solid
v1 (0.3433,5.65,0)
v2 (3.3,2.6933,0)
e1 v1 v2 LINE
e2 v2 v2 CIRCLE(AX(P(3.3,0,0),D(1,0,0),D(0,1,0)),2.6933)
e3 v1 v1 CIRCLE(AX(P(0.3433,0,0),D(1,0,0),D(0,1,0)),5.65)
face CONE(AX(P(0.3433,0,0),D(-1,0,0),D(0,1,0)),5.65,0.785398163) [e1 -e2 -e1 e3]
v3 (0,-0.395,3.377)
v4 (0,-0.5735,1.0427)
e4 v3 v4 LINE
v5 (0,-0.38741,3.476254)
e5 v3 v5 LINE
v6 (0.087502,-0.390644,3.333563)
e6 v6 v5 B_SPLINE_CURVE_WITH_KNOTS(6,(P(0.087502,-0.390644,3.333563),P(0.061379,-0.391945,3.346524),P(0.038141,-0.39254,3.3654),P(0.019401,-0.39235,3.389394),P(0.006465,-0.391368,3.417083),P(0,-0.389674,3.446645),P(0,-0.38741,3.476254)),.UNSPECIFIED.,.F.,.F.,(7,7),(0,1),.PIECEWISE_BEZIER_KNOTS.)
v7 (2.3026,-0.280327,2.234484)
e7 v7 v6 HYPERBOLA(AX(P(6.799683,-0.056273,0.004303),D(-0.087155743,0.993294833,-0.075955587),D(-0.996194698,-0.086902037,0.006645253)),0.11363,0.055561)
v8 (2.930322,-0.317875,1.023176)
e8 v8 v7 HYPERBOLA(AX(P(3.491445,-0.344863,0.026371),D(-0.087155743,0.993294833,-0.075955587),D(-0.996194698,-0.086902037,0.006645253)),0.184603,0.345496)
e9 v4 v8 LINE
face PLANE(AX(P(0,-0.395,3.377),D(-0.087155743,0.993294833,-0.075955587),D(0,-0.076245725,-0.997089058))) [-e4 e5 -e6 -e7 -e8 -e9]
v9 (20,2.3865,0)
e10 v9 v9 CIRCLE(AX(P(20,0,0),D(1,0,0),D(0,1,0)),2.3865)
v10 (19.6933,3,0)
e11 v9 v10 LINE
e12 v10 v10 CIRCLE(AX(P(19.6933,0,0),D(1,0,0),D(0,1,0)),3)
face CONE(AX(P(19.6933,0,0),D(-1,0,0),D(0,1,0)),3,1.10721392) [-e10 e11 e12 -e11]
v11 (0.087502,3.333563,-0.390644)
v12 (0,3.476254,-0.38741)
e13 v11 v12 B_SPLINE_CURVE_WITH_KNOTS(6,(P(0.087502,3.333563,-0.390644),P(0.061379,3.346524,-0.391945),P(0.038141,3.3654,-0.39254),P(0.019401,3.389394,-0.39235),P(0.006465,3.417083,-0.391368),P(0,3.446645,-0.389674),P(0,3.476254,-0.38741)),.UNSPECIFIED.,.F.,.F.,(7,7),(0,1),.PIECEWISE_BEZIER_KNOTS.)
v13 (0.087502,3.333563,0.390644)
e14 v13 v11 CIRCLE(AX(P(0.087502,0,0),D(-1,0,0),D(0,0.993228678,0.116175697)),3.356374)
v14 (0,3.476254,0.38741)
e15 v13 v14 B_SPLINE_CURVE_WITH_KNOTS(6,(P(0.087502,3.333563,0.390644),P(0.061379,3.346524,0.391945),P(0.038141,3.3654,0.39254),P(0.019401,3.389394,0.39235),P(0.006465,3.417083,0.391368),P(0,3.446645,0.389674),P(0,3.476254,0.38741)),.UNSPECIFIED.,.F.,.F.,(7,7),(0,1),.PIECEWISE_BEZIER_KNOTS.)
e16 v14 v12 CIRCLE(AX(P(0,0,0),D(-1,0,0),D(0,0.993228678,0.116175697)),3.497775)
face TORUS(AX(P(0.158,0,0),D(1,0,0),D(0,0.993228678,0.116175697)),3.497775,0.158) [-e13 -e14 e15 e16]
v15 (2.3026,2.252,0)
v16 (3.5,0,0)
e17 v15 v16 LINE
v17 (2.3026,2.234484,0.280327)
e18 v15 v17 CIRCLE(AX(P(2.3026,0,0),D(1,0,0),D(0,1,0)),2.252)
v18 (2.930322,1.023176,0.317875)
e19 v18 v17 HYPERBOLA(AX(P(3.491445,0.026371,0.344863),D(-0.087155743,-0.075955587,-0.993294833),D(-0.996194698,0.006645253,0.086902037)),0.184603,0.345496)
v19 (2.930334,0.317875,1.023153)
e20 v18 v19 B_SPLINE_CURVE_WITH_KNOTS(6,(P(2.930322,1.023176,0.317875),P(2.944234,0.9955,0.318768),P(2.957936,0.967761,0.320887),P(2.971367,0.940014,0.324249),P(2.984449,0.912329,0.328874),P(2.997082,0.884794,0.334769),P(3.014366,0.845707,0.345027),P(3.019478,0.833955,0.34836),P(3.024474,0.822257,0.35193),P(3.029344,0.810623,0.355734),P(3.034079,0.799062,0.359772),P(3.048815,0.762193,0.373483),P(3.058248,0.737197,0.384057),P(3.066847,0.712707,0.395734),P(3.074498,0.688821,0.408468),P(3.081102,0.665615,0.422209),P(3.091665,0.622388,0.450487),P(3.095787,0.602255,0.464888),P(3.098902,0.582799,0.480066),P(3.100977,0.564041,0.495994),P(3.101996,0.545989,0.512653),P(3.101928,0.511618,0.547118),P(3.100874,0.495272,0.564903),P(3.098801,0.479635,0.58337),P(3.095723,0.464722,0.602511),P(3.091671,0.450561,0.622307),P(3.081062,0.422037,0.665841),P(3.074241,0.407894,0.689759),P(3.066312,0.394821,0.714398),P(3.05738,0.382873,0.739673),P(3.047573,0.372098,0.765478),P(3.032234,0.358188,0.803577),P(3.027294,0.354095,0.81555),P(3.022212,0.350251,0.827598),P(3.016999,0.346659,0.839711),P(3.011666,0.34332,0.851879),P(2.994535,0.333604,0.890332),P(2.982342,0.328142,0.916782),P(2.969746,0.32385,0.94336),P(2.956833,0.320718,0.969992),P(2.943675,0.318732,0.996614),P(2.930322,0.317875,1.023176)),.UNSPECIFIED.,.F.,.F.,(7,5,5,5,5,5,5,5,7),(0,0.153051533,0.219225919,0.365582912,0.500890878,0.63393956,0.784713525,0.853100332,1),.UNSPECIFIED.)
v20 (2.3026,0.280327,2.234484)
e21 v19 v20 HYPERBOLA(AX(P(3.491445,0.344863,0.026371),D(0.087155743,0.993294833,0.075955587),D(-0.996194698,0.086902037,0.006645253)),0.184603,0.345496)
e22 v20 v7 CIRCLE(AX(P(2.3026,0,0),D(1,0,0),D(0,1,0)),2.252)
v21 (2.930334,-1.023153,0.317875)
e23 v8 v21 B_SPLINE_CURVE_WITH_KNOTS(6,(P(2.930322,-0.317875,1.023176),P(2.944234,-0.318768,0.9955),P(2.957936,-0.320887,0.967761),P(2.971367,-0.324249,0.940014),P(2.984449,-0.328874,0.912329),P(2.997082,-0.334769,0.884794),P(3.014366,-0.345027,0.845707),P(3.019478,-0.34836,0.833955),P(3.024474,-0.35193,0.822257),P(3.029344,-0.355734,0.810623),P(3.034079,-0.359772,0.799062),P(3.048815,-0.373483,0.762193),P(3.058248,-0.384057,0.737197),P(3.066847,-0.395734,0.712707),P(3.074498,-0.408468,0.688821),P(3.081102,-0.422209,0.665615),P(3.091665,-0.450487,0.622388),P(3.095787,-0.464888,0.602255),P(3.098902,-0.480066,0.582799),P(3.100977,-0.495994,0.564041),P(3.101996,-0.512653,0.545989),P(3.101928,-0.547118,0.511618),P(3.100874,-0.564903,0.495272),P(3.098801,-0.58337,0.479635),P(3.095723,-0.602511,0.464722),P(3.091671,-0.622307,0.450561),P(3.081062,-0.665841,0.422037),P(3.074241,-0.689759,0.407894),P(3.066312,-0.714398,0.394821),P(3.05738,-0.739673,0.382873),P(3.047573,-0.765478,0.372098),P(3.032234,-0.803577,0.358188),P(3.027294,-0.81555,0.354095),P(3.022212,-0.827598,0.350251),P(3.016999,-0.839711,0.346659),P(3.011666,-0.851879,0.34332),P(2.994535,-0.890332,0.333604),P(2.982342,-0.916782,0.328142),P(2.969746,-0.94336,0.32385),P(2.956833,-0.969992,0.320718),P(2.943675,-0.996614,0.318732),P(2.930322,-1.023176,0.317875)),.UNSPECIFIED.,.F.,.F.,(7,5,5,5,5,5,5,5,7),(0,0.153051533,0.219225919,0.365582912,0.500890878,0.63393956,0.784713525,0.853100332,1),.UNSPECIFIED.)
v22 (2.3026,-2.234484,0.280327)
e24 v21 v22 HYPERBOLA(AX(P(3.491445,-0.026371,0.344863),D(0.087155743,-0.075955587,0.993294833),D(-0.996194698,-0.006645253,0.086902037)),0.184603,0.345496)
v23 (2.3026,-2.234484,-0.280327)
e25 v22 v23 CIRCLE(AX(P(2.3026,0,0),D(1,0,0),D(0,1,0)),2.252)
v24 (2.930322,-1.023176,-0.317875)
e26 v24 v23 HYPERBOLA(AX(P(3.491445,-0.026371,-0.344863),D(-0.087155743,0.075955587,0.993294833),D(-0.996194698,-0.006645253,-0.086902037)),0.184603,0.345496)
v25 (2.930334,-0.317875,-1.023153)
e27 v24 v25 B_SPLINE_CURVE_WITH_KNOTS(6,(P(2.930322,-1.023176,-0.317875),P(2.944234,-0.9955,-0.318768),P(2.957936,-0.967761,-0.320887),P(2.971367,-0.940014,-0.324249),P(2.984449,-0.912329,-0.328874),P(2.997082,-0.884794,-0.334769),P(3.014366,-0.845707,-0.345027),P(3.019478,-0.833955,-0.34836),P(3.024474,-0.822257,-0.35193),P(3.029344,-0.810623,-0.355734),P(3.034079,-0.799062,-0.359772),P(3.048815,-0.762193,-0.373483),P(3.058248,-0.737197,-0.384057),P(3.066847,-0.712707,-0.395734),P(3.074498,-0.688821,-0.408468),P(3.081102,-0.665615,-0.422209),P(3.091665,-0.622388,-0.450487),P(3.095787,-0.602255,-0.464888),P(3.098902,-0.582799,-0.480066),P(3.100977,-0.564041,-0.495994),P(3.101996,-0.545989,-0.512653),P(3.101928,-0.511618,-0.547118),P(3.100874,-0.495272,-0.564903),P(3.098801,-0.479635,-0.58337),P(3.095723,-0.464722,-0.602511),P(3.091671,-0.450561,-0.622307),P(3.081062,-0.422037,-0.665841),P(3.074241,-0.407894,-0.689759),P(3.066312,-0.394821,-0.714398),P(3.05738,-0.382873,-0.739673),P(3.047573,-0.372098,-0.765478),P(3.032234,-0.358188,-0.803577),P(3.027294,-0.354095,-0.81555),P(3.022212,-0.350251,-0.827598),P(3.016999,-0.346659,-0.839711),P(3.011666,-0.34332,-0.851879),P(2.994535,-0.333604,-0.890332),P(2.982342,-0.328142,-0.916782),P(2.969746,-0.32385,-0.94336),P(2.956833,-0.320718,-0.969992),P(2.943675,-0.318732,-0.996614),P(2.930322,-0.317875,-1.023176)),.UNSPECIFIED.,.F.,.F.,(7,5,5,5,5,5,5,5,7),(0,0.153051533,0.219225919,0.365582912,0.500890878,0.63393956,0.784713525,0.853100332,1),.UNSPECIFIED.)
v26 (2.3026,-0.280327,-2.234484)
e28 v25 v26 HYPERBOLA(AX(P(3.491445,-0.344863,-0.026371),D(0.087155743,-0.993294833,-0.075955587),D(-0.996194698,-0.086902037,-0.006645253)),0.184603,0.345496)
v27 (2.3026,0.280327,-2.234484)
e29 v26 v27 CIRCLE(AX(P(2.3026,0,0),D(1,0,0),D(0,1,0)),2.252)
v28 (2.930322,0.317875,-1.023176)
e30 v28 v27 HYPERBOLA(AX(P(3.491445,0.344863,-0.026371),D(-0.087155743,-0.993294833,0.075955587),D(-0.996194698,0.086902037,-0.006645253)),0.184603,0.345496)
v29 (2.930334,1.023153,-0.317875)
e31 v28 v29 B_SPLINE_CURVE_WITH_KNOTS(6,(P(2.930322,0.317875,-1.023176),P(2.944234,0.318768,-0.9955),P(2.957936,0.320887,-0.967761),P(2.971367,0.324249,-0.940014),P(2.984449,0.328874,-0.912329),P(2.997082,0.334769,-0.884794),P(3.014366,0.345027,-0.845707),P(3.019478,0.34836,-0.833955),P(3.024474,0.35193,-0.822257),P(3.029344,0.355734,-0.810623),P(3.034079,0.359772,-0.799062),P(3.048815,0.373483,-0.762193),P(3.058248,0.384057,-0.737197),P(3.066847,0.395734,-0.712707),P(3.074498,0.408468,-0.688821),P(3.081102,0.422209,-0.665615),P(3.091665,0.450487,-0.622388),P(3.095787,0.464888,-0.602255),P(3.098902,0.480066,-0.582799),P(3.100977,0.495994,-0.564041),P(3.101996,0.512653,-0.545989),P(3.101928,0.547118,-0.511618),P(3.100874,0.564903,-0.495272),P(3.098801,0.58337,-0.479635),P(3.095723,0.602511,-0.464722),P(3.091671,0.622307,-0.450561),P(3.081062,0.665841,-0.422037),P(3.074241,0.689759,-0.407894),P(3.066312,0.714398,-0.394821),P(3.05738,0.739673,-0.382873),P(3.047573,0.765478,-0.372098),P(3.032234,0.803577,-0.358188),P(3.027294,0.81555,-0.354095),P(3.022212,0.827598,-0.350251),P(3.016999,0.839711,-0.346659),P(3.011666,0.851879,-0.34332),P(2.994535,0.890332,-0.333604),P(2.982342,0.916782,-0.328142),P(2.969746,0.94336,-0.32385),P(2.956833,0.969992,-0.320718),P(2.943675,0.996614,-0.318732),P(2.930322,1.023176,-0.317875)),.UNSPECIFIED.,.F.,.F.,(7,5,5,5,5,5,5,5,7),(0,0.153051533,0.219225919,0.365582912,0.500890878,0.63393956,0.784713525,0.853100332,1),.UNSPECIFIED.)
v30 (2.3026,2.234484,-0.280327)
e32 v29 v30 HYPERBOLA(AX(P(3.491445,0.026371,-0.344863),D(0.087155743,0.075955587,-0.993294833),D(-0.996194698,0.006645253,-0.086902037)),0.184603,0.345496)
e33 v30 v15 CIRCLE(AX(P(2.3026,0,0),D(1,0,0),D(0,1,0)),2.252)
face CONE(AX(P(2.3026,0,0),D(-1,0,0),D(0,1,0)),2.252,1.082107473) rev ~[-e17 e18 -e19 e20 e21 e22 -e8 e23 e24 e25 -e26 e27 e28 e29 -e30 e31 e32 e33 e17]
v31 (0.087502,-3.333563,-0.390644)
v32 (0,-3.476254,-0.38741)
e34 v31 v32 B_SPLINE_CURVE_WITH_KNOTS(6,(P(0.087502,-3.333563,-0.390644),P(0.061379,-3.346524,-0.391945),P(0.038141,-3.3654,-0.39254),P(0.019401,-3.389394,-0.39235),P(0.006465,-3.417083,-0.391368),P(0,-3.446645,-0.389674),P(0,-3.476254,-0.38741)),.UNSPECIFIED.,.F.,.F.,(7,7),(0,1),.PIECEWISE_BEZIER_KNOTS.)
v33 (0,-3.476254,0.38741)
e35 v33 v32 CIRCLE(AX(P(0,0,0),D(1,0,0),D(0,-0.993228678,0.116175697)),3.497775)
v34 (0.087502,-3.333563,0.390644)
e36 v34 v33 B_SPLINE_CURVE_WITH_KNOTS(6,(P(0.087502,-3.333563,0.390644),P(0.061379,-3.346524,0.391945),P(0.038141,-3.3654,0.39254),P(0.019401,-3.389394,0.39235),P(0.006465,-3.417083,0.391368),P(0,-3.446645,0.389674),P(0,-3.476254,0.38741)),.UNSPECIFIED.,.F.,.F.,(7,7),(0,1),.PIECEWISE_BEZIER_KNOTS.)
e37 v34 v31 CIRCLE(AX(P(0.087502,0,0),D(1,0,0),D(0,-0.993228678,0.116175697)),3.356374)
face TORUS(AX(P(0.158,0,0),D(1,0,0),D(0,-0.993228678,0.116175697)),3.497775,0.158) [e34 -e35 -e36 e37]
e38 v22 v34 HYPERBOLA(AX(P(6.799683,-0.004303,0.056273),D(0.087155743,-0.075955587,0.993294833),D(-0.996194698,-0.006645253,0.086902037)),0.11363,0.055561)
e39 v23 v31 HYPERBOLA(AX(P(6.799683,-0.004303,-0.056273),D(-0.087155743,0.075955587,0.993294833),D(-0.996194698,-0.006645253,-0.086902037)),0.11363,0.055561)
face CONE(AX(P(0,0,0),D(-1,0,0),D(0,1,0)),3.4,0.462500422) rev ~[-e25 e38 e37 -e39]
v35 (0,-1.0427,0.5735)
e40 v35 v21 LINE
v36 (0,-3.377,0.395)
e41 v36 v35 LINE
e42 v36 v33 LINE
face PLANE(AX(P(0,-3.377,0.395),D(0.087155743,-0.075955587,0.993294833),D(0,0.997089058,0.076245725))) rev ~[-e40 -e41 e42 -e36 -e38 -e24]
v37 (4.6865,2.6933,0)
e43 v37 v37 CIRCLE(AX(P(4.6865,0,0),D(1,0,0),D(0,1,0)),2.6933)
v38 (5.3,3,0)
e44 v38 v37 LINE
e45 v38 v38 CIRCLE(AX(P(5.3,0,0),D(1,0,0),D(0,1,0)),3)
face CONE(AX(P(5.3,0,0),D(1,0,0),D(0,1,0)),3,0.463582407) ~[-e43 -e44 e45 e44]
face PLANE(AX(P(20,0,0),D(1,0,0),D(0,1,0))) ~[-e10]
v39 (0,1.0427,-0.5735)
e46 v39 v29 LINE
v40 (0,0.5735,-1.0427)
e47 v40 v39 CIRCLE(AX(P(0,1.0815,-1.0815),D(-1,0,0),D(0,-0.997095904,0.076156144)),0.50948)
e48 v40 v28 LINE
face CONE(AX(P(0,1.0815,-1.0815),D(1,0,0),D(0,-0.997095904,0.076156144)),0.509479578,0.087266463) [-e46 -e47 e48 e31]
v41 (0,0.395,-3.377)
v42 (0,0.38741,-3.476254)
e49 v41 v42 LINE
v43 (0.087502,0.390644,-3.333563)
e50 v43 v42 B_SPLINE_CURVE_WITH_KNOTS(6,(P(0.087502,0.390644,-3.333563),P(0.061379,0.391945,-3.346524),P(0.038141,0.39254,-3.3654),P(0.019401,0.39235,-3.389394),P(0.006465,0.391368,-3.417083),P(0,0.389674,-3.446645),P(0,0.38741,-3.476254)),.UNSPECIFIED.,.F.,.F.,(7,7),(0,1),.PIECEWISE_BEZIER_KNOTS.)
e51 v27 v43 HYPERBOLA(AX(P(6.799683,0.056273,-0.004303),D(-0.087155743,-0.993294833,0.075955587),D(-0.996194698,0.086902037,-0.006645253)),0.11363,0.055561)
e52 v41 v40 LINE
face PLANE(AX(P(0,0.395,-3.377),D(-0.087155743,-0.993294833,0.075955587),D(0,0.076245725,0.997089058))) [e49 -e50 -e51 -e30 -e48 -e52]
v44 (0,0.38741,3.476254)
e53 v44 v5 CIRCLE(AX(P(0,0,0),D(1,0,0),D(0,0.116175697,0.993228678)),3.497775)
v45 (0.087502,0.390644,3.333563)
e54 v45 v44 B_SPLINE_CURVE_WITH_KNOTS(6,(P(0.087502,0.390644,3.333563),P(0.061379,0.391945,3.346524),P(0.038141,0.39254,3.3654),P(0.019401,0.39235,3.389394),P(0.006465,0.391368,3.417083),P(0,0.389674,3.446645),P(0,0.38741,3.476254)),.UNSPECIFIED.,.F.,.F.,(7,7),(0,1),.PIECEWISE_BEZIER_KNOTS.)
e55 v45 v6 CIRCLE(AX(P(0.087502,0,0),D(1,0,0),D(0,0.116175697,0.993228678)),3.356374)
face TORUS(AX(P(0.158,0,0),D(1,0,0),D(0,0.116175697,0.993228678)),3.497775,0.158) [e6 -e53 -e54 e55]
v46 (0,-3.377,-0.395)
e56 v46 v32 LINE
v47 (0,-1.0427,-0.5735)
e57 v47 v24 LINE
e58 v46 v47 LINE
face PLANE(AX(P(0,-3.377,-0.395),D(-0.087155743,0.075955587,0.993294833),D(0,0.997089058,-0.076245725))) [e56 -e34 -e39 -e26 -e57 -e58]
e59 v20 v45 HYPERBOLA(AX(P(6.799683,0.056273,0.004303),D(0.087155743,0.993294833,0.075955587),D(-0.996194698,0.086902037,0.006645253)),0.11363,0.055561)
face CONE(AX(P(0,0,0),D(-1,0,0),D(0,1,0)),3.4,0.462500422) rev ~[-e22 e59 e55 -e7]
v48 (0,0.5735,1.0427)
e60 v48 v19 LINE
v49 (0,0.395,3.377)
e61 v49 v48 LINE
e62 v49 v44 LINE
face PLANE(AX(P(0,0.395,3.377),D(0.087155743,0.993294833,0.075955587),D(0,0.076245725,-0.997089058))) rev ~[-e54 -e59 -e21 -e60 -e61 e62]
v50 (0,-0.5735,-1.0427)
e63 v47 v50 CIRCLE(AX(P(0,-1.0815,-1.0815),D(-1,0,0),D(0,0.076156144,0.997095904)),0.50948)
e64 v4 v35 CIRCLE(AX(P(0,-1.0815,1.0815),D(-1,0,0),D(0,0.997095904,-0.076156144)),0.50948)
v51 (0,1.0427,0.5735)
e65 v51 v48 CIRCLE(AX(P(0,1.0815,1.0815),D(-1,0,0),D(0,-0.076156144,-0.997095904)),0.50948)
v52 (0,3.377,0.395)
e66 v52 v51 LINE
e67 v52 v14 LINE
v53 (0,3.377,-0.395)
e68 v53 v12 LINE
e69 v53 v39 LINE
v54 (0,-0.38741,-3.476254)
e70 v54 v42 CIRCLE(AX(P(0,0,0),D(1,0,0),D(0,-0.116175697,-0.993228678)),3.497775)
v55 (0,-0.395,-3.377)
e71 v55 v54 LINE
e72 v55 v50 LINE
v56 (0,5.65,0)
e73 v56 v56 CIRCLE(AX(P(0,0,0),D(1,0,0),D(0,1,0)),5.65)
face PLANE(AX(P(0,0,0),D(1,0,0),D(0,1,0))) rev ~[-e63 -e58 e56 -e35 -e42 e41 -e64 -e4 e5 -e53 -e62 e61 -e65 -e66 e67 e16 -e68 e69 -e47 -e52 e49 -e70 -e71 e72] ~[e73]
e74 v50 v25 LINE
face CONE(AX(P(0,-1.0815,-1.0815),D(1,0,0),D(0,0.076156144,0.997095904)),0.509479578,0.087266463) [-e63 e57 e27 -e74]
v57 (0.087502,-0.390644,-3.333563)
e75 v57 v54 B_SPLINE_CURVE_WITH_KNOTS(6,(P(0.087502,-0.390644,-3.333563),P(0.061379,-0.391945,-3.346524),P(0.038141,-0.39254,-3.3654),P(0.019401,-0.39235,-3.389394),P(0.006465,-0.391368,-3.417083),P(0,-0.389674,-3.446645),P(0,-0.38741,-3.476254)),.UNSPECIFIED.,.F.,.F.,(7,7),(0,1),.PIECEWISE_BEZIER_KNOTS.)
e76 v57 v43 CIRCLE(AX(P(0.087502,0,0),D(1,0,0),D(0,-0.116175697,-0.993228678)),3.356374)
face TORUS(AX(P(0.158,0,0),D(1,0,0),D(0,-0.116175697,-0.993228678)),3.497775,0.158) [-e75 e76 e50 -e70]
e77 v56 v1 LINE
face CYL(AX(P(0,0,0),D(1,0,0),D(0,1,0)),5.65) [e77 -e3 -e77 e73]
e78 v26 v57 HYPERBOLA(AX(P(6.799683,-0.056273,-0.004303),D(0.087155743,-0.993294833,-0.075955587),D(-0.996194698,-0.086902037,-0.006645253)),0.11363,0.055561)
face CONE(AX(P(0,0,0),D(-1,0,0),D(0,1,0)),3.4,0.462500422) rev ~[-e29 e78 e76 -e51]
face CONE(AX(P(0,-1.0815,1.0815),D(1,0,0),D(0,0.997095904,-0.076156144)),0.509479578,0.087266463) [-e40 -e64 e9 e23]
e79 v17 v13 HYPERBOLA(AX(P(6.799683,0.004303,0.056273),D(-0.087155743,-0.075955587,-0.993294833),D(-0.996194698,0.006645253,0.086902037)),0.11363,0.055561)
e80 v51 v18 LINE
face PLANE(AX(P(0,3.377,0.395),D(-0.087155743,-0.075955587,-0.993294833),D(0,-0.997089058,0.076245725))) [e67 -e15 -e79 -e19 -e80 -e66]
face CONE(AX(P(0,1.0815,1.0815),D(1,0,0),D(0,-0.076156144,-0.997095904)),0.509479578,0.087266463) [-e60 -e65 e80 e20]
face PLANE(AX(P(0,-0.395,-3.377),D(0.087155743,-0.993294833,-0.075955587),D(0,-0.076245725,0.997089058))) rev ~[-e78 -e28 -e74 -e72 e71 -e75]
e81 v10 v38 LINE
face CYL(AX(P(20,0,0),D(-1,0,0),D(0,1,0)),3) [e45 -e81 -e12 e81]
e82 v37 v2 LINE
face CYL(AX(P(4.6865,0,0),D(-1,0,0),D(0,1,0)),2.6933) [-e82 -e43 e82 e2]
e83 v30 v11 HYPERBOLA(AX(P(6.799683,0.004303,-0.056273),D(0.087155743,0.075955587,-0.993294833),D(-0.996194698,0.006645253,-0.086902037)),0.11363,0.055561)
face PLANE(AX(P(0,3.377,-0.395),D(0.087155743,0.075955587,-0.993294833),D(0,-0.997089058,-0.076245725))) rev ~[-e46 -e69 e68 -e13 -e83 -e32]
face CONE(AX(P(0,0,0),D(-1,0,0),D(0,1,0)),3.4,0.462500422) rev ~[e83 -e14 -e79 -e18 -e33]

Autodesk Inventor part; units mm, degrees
ref_plane "YZ Plane" through (0, 0, 0) normal (1, 0, 0) x (0, 1, 0)
ref_plane "XZ Plane" through (0, 0, 0) normal (0, 1, 0) x (-1, 0, 0)
sketch "Эскиз1" plane through (0, 0, 0) normal (0, 0, 1) x (1, 0, 0)
  line L0 (3.5, 0) -> (20, 0)
  line L1 (20, 0) -> (20, 3)
  line L2 (20, 3) -> (5.3, 3)
  line L3 (5.3, 3) -> (4.6865, 2.6933)
  line L4 (4.6865, 2.6933) -> (3.3, 2.6933)
  line L5 (0, 5.65) -> (0, 3.4)
  line L6 (0, 3.4) -> (2.3026, 2.252)
  line L7 (2.3026, 2.252) -> (3.5, 0)
  line L8 (-4, 0) -> (24, 0) projected
  line L9 (0, -1.13) -> (0, 6.78) projected
  line L10 (0, 5.65) -> (0.3433, 5.65)
  line L11 (0.3433, 5.65) -> (3.3, 2.6933)
  line L12 (5.3, 3) -> (2.9933, 3) construction
  dimension "d1" = 14.7
  dimension "d2" = 6
  dimension "d3" = 5.3865
  dimension "d4" = 6.8
  dimension "d5" = 26.5
  dimension "d6" = 62
  dimension "d7" = 3.5
  dimension "d8" = 0.6135
  dimension "d12" = 11.3
  dimension "d13" = 45
  dimension "d15" = 20
  dimension "d24" = 3.3
revolve "Базовый элемент" add sketch "Эскиз1" angle 360 about axis through (3.5, 0, 0) along (1, 0, 0) contours L7 L6 L5 L10 L11 L4 L3 L2 L1 L0
sketch "Эскиз2" plane through (0, 0, 0) normal (-1, 0, 0) x (0, 0, 1)
  line L0 (0, 3.4) -> (0, 0) construction
  line L1 (0, 0) -> (3.4, 0) construction
  arc A0 (1.02, 0) -> (0, 1.02) centre (0, 0) ccw construction
  arc A1 (1.19, 0) -> (0, 1.19) centre (0, 0) ccw construction
  arc A2 (3.377, 0.395) -> (0.395, 3.377) centre (0, 0) ccw
  line L2 (0, 0) -> (2.4042, 2.4042) construction
  line L3 (0.395, 3.377) -> (0.5735, 1.0427)
  line L4 (3.377, 0.395) -> (1.0427, 0.5735)
  arc A3 (0.395, 3.377) -> (0, 3.4) centre (0, 0) ccw
  arc A4 (3.4, 0) -> (3.377, 0.395) centre (0, 0) ccw
  line L5 (0, -7.91) -> (0, 7.91) projected
  line L6 (-7.91, 0) -> (7.91, 0) projected
  arc A5 (0.395, -3.377) -> (3.377, -0.395) centre (0, 0) ccw
  line L7 (0.395, -3.377) -> (0.5735, -1.0427)
  line L8 (3.377, -0.395) -> (1.0427, -0.5735)
  arc A6 (0, -3.4) -> (0.395, -3.377) centre (0, 0) ccw
  arc A7 (3.377, -0.395) -> (3.4, 0) centre (0, 0) ccw
  arc A8 (-0.395, 3.377) -> (-3.377, 0.395) centre (0, 0) ccw
  line L9 (-0.395, 3.377) -> (-0.5735, 1.0427)
  line L10 (-3.377, 0.395) -> (-1.0427, 0.5735)
  arc A9 (0, 3.4) -> (-0.395, 3.377) centre (0, 0) ccw
  arc A10 (-3.377, 0.395) -> (-3.4, 0) centre (0, 0) ccw
  arc A11 (-0.395, -3.377) -> (0, -3.4) centre (0, 0) ccw
  arc A12 (-3.377, -0.395) -> (-0.395, -3.377) centre (0, 0) ccw
  arc A13 (-3.4, 0) -> (-3.377, -0.395) centre (0, 0) ccw
  line L11 (-3.377, -0.395) -> (-1.0427, -0.5735)
  line L12 (-0.395, -3.377) -> (-0.5735, -1.0427)
  arc A14 (0.5735, 1.0427) -> (1.0427, 0.5735) centre (1.0815, 1.0815) ccw
  arc A15 (1.0427, -0.5735) -> (0.5735, -1.0427) centre (1.0815, -1.0815) ccw
  arc A16 (-1.0427, 0.5735) -> (-0.5735, 1.0427) centre (-1.0815, 1.0815) ccw
  arc A17 (-0.5735, -1.0427) -> (-1.0427, -0.5735) centre (-1.0815, -1.0815) ccw
  point P0 (2.4042, -2.4042)
  point P1 (-2.4042, 2.4042)
  point P2 (-2.4042, -2.4042)
  dimension "d17" = 2.04
  dimension "d18" = 2.38
  dimension "d19" = 6.8
  dimension "d20" = 45
  dimension "d21" = 0.395
extrude "Паз" add sketch "Эскиз2" against normal up to next draft 5 contours L4 A14 L3 A2 | A5 L7 A15 L8 | L9 A16 L10 A8 | A12 L11 A17 L12
fillet "Сопряжение1" radius 0.158 4 edges at (0, 3.4, 0) (0, 0, -3.4) (0, -3.4, 0) (0, 0, 3.4)
thread "Резьба" size "M6x1" class "6g" standard "ISO Metric profile" length 14.7
chamfer "Фаска1" distance 0.6135 distance2 0.3067 1 edges at (20, -3, 0) measured on face at (20, 0.8631, 0.1984)
ref_plane "Work Plane2" through (3.35, 0, 0) normal (0, 0, -1) x (1, 0, 0)
equation "\"d1\" = GEL"
equation "\"d2\" = GD"
equation "\"d3\" = BDM"
equation "\"d4\" = SDM"
equation "\"d7\" = INTI"
equation "\"d8\" = GAL"
equation "\"d12\" = KOD"
equation "\"d13\" = 0.5 * SEWI"
equation "\"d15\" = NLG"
equation "\"d24\" = KOH"
equation "\"d17\" = 0.3 * SDM"
equation "\"d18\" = 0.35 * SDM"
equation "\"d19\" = SDM"
equation "\"d21\" = 0.5 * SBR"
equation "\"d23\" = 0.2 * SBR"
equation "\"d10\" = GEL"
equation "\"d25\" = -0.5 * SPD + 0.5 * GD"
equation "\"d26\" = 0.5 * GAL"
equation "\"NLG\" = 20"
equation "\"GEL\" = 14.7"
equation "\"GAL\" = 0.61345 * PTC"
equation "\"SPD\" = NND - 1.2269 * PTC"
equation "\"KOD\" = 11.3"
equation "\"KOH\" = 3.3"
equation "\"SBR\" = 0.79"
equation "\"INTI\" = 3.5"
equation "\"SDM\" = 6.8"
equation "\"GD\" = NND"
equation "\"BDM\" = NND - GAL"
equation "\"SEWI\" = 90deg"
equation "\"d9\" = SDM"
equation "\"GUL\" = 0.61345 * PTC"
equation "\"TOA\" = 30deg"
equation "\"EPV\" = 6.3"
equation "\"THREADDIA\" = 6"
equation "\"PTC\" = 1"
equation "\"NND\" = 6"
equation "\"GD1\" = THREADDIA - 1.2269 * PTC"
properties part number "ISO 7046-1 - M6 x 20 - 4.8 - H" material "Сталь"
